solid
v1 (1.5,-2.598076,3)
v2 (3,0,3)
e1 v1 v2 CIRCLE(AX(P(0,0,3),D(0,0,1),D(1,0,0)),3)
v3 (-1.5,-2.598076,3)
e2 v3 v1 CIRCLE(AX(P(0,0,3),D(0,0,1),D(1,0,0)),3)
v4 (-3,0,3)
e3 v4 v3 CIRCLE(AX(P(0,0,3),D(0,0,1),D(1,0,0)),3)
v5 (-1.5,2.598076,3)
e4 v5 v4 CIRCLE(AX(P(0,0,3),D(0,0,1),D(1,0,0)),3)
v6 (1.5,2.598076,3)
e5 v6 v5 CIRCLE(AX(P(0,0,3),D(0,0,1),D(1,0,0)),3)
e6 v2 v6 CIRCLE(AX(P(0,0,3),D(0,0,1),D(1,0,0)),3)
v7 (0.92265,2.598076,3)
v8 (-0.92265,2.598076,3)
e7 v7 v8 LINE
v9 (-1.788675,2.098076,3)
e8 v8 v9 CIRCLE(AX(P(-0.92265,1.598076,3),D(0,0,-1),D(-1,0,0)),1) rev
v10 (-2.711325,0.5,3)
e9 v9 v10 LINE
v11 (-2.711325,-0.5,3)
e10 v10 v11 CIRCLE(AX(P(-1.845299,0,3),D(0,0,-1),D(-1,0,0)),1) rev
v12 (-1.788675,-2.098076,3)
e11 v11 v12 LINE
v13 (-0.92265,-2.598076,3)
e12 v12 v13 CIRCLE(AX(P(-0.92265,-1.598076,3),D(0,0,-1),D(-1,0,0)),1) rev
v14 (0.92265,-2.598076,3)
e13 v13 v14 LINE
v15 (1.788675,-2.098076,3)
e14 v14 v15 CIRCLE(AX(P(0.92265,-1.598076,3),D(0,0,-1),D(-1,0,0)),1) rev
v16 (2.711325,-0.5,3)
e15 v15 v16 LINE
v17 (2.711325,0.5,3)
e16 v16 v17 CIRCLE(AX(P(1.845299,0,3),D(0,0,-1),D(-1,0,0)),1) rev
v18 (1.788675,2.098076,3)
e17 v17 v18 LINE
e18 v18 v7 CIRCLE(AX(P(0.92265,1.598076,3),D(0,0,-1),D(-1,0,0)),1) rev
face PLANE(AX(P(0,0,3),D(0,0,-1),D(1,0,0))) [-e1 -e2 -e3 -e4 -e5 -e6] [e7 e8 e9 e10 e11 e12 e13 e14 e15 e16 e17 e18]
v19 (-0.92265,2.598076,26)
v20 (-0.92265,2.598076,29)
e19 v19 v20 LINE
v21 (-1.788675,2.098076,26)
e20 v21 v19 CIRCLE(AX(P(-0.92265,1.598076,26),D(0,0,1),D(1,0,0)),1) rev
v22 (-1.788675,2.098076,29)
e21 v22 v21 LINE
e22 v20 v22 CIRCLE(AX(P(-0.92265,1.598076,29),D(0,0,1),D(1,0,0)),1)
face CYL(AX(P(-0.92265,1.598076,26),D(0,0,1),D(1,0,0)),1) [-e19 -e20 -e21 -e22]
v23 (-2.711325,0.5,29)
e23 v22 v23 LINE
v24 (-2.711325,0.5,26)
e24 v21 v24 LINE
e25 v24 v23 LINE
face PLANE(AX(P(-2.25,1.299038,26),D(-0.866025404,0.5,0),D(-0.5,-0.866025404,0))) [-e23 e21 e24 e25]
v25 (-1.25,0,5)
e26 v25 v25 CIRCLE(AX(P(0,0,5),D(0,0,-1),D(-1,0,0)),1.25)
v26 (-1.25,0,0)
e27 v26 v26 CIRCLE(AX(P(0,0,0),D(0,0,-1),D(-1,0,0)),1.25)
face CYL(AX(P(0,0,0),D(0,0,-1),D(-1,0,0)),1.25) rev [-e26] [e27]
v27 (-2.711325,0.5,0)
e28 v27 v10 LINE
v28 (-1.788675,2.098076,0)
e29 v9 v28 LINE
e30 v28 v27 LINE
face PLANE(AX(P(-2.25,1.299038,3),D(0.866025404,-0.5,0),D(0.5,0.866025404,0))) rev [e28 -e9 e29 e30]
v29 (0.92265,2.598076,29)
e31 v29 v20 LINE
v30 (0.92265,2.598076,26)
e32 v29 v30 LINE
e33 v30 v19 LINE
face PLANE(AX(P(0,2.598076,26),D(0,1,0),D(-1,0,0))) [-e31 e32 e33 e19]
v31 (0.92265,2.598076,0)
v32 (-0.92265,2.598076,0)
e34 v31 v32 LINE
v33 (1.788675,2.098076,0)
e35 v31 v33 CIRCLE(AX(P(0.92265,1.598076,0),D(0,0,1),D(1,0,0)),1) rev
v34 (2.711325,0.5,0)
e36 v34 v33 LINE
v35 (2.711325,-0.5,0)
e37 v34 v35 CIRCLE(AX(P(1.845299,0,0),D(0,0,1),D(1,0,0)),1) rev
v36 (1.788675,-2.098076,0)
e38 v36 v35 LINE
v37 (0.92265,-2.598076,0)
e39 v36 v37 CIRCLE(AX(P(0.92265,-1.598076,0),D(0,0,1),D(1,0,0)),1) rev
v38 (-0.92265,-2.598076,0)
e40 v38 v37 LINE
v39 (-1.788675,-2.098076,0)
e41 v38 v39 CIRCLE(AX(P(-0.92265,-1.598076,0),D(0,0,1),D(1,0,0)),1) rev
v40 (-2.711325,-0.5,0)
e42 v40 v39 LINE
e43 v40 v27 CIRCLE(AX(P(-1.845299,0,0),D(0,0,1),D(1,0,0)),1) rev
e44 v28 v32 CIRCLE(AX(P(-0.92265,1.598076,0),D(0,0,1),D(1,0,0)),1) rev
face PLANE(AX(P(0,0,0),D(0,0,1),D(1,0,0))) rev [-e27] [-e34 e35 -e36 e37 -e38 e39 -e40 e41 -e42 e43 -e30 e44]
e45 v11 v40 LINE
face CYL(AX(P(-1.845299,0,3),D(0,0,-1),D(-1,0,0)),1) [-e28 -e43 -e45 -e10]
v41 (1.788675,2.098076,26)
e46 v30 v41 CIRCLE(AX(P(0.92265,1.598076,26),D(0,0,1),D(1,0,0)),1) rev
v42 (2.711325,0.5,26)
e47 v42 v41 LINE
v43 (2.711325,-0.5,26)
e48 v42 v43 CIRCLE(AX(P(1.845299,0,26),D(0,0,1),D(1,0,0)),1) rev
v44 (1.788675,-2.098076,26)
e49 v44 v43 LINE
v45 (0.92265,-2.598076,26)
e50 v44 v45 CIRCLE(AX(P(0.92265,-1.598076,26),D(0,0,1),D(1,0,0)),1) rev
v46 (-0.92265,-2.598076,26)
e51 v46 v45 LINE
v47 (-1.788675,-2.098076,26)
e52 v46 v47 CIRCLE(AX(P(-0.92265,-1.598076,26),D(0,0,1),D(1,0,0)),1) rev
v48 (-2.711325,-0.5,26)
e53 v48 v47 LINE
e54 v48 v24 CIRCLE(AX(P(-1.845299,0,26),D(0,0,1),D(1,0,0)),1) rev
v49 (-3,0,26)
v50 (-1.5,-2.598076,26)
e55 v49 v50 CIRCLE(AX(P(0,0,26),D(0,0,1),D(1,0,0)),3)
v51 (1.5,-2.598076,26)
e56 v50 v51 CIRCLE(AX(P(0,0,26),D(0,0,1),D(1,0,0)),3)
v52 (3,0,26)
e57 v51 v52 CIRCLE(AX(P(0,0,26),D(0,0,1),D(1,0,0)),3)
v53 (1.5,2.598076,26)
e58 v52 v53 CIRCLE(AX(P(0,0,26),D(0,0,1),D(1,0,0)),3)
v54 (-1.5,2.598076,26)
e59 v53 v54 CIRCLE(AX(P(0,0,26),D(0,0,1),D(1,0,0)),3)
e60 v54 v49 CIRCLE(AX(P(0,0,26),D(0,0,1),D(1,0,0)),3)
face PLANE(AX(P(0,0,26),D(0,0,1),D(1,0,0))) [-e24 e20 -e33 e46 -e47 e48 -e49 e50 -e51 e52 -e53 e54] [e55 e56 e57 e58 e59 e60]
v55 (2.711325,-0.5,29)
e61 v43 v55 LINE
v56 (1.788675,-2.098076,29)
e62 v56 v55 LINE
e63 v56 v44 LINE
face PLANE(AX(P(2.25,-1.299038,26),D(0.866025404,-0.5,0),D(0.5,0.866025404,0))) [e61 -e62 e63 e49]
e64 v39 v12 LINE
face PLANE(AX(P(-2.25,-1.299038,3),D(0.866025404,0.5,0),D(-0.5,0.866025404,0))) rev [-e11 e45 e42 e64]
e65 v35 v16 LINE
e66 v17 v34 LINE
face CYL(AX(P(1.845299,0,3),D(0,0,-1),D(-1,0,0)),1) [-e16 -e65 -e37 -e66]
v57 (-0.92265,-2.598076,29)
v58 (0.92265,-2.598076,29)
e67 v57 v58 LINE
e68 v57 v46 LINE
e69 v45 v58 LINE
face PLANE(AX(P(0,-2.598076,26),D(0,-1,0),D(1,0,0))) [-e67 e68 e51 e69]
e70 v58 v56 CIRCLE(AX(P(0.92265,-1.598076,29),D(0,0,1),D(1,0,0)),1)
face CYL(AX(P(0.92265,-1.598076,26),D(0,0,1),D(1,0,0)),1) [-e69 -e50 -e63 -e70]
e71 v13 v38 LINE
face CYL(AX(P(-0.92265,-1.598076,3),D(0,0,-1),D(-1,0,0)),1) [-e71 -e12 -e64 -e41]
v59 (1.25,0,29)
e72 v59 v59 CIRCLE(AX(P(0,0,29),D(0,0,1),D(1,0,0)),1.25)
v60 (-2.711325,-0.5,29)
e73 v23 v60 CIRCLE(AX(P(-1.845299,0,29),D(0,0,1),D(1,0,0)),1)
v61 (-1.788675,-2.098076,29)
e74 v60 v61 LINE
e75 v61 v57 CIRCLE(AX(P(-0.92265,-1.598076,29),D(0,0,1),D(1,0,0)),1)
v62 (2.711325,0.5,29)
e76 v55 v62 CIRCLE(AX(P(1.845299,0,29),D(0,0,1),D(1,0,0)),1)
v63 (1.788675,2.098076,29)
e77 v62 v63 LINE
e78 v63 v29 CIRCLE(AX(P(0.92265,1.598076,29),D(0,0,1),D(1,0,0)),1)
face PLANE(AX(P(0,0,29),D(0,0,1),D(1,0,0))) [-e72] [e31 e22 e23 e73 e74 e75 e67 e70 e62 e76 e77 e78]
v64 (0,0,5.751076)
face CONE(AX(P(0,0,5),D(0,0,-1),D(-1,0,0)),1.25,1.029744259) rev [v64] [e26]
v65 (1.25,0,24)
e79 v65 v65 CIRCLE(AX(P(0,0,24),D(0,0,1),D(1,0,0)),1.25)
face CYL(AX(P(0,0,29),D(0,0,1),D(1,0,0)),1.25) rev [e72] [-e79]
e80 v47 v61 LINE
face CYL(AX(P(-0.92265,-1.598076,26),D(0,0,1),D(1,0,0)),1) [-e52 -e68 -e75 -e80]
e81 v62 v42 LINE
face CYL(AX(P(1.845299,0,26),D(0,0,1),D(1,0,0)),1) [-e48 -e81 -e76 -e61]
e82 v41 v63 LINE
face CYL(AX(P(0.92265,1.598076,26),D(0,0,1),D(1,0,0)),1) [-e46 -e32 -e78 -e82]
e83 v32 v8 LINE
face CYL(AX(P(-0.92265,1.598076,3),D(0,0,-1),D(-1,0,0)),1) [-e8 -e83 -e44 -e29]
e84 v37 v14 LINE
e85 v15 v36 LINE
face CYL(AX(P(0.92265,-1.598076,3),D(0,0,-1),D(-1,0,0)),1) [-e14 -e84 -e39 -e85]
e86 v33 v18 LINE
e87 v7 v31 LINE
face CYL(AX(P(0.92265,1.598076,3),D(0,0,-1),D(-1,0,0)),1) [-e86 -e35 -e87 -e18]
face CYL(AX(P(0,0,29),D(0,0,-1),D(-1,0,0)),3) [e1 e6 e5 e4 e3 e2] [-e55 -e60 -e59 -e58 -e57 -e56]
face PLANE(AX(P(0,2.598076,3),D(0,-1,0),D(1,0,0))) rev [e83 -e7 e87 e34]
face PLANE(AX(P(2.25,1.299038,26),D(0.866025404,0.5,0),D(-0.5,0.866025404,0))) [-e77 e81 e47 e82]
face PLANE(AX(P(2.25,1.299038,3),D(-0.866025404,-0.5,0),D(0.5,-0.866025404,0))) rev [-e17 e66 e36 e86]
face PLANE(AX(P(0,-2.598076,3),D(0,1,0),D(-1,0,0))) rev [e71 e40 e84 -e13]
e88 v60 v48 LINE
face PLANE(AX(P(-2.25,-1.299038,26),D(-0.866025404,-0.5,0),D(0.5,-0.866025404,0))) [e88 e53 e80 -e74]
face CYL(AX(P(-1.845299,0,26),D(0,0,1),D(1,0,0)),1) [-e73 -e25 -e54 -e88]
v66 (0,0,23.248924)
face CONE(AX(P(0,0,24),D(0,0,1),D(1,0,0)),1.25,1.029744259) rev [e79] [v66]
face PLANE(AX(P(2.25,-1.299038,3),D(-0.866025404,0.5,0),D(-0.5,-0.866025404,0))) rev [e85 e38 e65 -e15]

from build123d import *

# Parameters (mm, degrees)
SKETCH1_R           = 3
BOSS_EXTRUDE1_DEPTH = 29
CUT_EXTRUDE1_START  = -3
CUT_EXTRUDE1_DEPTH  = 3
FILLET1_R           = 1


with BuildPart() as part:
    # Sketch1 → Boss-Extrude1 (new body)
    with BuildSketch(Plane.XY):
        with Locations(Location((0, 0, 0), (0, 0, 180))):
            Circle(SKETCH1_R)
    extrude(amount=BOSS_EXTRUDE1_DEPTH)

    # Sketch3 → Cut-Extrude1 (cut)
    with BuildSketch(Plane.XY.offset(29).offset(CUT_EXTRUDE1_START)):
        with BuildLine():
            Line((-3, 0), (-1.5, 2.598076211))
            ThreePointArc((-1.5, 2.598076211), (-2.598076211, 1.5), (-3, 0))
        make_face()
        with BuildLine():
            Line((1.5, 2.598076211), (3, 0))
            ThreePointArc((3, 0), (2.598076211, 1.5), (1.5, 2.598076211))
        make_face()
        with BuildLine():
            Line((-1.5, 2.598076211), (1.5, 2.598076211))
            ThreePointArc((1.5, 2.598076211), (0, 3), (-1.5, 2.598076211))
        make_face()
        with BuildLine():
            ThreePointArc((-3, 0), (-2.598076211, -1.5), (-1.5, -2.598076211))
            Line((-1.5, -2.598076211), (-3, 0))
        make_face()
        with BuildLine():
            ThreePointArc((-1.5, -2.598076211), (0, -3), (1.5, -2.598076211))
            Line((1.5, -2.598076211), (-1.5, -2.598076211))
        make_face()
        with BuildLine():
            ThreePointArc((1.5, -2.598076211), (2.598076211, -1.5), (3, 0))
            Line((3, 0), (1.5, -2.598076211))
        make_face()
    cut_extrude1 = extrude(amount=CUT_EXTRUDE1_DEPTH, mode=Mode.SUBTRACT)

    # Mirror1: Cut-Extrude1 across plane
    add(cut_extrude1.mirror(Plane(origin=(0, 0, 14.5), x_dir=(1, 0, 0), z_dir=(0, 0, -1))), mode=Mode.SUBTRACT)

    # Sketch6 → Tap Drill for M3x0.5 Tap1 (revolve, cut)
    with BuildSketch(Plane(origin=(0, 0, 29), x_dir=(0, -1, 0), z_dir=(1, 0, 0))):
        Polygon((0, 0), (0, 5.751075774), (1.25, 5), (1.25, 0), align=None)
    tap_drill_for_m3x0_5_tap1 = revolve(axis=Axis((0, 0, 35.35), (0, 0, -1)), mode=Mode.SUBTRACT)

    # Mirror2: Tap Drill for M3x0.5 Tap1 across plane
    add(tap_drill_for_m3x0_5_tap1.mirror(Plane(origin=(0, 0, 14.5), x_dir=(1, 0, 0), z_dir=(0, 0, -1))), mode=Mode.SUBTRACT)

    # Fillet1
    # the kernel refuses this fillet: 1 mm, written as the material it takes off along each edge
    with BuildSketch(Plane(origin=(-1.5, 2.598076211, 26), x_dir=(-0.4999999999999951, -0.8660254037844416, 0), z_dir=(0, 0, 1)), Plane(origin=(3, 0, 26), x_dir=(-0.5000000000000018, 0.8660254037844377, 0), z_dir=(0, 0, 1)), Plane(origin=(1.5, 2.598076211, 26), x_dir=(-1, 0, 0), z_dir=(0, 0, 1)), Plane(origin=(1.5, -2.598076211, 26), x_dir=(0.4999999999999949, 0.8660254037844417, 0), z_dir=(0, 0, 1)), Plane(origin=(-1.5, -2.598076211, 26), x_dir=(1, 0, 0), z_dir=(0, 0, 1)), Plane(origin=(-3, 0, -1.443375673), x_dir=(0.500000000000007, -0.8660254037844346, 0), z_dir=(0, 0, 1)), Plane(origin=(3, 0, 3), x_dir=(-0.4999999999999955, -0.8660254037844413, 0), z_dir=(0, 0, -1)), Plane(origin=(1.5, -2.598076211, 3), x_dir=(-1, 0, 0), z_dir=(0, 0, -1)), Plane(origin=(-1.5, -2.598076211, 3), x_dir=(-0.5000000000000073, 0.8660254037844345, 0), z_dir=(0, 0, -1))) as fillet1_piece_1:
        with BuildLine():
            CenterArc((FILLET1_R * 0.57735026919, FILLET1_R), FILLET1_R, 210, 60)
            Line((-FILLET1_R * 0.288675134595, FILLET1_R * 0.5), (0, 0))
            Line((0, 0), (FILLET1_R * 0.57735026919, 0))
        make_face()
    extrude(amount=4.443375673, mode=Mode.SUBTRACT)
    with BuildSketch(Plane(origin=(-3, 0, 26), x_dir=(0.5000000000000109, 0.8660254037844323, 0), z_dir=(0, 0, 1)), Plane(origin=(-1.5, 2.598076211, 3), x_dir=(-0.4999999999999951, -0.8660254037844416, 0), z_dir=(0, 0, -1)), Plane(origin=(1.5, 2.598076211, 3), x_dir=(-1, 0, 0), z_dir=(0, 0, -1))) as fillet1_piece_2:
        with BuildLine():
            CenterArc((FILLET1_R * 0.57735026919, -FILLET1_R), FILLET1_R, 90, 60)
            Line((-FILLET1_R * 0.288675134595, -FILLET1_R * 0.5), (0, 0))
            Line((0, 0), (FILLET1_R * 0.57735026919, 0))
        make_face()
    extrude(amount=4.443375673, mode=Mode.SUBTRACT)


solid = part.part
